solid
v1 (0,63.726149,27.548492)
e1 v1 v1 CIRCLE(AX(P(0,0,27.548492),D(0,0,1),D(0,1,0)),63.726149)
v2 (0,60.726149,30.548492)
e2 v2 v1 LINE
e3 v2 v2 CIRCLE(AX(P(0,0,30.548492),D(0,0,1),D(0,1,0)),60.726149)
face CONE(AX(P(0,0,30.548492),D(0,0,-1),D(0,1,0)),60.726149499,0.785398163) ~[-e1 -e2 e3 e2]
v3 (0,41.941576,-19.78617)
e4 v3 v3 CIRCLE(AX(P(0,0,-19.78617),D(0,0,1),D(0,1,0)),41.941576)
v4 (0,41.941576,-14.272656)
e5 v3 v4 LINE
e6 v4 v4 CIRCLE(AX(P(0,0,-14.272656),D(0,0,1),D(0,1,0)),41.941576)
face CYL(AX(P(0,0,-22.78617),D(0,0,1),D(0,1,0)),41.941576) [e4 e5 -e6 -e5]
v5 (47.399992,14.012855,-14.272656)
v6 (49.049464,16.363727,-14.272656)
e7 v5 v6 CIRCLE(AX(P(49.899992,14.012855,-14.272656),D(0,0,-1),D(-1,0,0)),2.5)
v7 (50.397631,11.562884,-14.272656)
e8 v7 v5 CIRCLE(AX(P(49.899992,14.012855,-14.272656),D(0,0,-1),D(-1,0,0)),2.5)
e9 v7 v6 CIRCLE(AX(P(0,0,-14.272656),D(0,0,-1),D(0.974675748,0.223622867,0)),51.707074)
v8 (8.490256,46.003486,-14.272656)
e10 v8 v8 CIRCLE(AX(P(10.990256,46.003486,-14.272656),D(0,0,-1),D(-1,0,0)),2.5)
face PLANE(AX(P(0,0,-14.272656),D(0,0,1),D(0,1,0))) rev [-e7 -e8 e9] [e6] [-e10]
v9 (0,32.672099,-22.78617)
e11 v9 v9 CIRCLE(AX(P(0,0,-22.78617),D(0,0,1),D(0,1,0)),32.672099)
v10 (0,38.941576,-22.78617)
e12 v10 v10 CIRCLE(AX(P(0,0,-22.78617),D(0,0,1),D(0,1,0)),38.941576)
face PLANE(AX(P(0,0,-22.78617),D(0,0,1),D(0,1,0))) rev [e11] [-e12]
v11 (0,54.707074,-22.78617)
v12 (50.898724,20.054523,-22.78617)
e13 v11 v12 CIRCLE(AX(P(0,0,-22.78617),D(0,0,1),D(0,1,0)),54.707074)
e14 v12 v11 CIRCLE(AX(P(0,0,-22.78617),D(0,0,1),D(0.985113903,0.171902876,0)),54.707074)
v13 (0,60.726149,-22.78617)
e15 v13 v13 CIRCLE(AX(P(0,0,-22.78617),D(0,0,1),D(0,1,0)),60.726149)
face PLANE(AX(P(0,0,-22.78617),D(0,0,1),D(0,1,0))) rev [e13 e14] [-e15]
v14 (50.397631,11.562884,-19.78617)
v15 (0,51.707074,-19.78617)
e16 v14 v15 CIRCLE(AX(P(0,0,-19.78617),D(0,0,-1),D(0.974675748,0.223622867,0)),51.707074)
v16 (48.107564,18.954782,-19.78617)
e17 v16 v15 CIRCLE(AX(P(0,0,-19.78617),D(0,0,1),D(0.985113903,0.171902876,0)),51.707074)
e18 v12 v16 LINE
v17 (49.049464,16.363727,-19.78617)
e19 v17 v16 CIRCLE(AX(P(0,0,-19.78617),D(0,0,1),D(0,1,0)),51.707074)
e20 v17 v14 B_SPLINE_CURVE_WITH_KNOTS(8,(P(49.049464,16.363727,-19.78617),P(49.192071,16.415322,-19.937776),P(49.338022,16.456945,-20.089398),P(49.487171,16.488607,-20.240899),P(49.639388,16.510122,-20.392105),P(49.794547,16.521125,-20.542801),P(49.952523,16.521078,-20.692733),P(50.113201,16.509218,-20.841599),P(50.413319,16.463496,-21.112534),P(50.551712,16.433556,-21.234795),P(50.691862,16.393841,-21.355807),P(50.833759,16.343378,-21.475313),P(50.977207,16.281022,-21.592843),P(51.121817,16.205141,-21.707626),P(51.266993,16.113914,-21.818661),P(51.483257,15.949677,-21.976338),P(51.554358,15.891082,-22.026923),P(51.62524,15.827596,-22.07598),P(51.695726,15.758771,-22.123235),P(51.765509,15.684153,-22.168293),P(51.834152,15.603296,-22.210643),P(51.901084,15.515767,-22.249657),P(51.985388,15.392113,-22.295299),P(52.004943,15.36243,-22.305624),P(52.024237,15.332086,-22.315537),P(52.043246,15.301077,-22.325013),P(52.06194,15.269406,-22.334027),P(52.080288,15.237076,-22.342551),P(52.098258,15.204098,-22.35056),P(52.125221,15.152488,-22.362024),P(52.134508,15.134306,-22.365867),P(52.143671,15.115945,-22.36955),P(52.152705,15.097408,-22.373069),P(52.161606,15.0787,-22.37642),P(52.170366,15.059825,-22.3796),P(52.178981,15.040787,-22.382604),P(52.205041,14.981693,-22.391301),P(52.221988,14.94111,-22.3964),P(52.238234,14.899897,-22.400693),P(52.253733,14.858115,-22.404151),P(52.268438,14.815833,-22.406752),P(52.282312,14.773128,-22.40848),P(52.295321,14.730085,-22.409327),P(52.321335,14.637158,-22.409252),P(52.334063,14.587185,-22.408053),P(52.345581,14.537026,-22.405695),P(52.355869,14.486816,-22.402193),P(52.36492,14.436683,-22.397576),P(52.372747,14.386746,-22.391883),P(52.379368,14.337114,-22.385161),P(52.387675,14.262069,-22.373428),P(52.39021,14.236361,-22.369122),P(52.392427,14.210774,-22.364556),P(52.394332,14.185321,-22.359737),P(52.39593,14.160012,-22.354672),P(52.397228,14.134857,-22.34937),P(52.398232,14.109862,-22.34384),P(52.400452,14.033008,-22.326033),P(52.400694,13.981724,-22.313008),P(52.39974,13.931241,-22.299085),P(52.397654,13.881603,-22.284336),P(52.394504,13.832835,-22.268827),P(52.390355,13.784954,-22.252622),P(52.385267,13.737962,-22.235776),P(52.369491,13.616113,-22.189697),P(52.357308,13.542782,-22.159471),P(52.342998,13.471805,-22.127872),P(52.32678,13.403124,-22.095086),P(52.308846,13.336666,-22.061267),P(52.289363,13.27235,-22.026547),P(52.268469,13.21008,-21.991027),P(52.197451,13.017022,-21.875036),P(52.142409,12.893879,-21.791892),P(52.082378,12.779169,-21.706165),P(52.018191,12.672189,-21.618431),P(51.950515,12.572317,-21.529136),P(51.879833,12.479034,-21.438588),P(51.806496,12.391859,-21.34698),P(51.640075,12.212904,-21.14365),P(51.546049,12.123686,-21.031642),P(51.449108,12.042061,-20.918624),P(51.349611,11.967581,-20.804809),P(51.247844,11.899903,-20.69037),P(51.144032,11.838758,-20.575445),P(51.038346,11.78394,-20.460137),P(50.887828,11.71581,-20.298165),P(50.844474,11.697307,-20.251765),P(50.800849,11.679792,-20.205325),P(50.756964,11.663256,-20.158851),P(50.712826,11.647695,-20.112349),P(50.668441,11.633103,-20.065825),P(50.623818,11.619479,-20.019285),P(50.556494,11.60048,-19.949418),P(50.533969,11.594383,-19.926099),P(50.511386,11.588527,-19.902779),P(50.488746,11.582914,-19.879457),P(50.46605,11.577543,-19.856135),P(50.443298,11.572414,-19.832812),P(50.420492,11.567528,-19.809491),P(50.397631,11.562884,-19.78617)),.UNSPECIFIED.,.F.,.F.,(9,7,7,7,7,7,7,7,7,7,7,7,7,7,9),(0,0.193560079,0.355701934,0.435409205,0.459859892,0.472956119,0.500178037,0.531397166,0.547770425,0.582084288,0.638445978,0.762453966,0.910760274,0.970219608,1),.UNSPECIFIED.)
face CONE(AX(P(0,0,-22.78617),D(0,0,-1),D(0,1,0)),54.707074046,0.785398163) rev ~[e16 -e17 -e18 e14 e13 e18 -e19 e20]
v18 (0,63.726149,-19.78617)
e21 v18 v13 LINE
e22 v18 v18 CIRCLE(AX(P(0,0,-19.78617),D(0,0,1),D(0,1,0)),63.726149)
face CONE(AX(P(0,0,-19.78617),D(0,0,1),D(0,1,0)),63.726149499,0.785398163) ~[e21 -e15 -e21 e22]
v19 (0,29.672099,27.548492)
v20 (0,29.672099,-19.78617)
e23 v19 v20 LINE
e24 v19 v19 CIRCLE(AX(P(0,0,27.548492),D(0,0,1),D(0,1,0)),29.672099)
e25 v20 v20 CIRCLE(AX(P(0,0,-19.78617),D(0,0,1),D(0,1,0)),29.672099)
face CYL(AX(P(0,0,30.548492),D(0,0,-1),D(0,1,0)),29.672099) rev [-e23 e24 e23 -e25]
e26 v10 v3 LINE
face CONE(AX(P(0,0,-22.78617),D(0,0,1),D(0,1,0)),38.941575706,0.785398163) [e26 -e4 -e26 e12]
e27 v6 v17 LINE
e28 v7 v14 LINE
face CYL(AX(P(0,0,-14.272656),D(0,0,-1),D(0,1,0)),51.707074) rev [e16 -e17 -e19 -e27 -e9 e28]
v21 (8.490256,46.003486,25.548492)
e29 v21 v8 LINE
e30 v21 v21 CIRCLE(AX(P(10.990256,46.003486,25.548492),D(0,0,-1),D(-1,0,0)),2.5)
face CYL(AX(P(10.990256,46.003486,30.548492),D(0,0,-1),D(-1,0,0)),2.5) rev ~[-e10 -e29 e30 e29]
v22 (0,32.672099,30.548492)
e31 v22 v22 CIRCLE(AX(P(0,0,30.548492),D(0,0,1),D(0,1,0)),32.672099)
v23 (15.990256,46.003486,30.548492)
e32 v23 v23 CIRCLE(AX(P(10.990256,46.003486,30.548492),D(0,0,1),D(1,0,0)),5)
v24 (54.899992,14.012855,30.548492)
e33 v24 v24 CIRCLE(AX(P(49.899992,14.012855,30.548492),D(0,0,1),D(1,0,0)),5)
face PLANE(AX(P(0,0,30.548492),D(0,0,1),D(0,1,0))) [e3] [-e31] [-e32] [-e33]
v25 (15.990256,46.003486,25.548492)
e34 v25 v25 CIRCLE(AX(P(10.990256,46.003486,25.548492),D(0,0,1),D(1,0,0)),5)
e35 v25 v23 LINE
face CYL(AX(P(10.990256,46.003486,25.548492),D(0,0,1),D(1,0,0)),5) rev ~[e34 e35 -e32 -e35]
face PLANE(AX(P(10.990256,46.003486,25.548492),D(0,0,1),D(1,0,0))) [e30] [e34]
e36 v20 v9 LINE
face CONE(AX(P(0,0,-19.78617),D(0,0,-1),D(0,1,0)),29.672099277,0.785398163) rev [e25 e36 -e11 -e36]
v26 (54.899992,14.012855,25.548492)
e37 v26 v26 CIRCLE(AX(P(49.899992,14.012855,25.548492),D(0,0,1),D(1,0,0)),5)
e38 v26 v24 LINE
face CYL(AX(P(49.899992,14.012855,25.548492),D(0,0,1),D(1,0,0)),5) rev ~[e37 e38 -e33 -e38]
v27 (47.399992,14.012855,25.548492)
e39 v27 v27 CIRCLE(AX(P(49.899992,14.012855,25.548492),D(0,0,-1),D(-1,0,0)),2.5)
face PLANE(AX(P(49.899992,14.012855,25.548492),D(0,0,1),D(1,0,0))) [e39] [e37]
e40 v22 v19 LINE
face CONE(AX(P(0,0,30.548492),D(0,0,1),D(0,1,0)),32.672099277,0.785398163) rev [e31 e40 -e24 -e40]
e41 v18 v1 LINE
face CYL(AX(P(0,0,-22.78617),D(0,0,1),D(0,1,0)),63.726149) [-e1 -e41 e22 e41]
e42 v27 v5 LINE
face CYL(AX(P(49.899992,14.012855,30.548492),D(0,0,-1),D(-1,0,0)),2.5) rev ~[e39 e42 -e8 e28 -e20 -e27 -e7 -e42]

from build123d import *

# Parameters (mm, degrees)
F3_D           = 5
F3_CBORE_D     = 10
F3_CBORE_DEPTH = 5
F4_T6_ANGLE    = 291.5048547237
F4_T14_ANGLE   = 80.1015252238


# Not quite as in the source:
# - a fillet or chamfer that OpenCascade refuses, or shapes differently, is made with other operations: its cross-section is extruded or revolved along the edge and cut away or added


with BuildPart() as f1:
    # F0 (on Right) → F1 (revolve)
    with BuildSketch(Plane.YZ):
        Polygon((63.7261494994, 30.5484924465), (29.6720992774, 30.5484924465), (29.6720992774, -22.7861702442), (41.941575706, -22.7861702442), (41.941575706, -14.2726562917), (51.7070740461, -14.2726562917), (51.7070740461, -22.7861702442), (63.7261494994, -22.7861702442), align=None)
    revolve(axis=Axis((0, 0, 14.0182273462), (0, 0, 1)))

    # F3 (through all)
    with Locations(Plane.XY.offset(30.5484924465)):
        with Locations((10.9902555123, 46.0034860298), (49.8999916017, 14.0128545463)):
            CounterBoreHole(F3_D / 2, F3_CBORE_D / 2, F3_CBORE_DEPTH)

    # F4: chamfer of 3 on 7 edges, made by hand

    # F4_s1 → F4_t2 (revolve, cut)
    with BuildSketch(Plane.YZ):
        Polygon((60.7261494994, 30.5484924465), (63.7261494994, 27.5484924465), (63.7261494994, 30.5484924465), align=None)
    revolve(axis=Axis((0, 0, 30.5484924465), (0, 0, 1)), mode=Mode.SUBTRACT)

    # F4_s3 → F4_t4 (revolve, cut)
    with BuildSketch(Plane.YZ):
        Polygon((63.7261494994, -19.7861702442), (60.7261494994, -22.7861702442), (63.7261494994, -22.7861702442), align=None)
    revolve(axis=Axis((0, 0, -22.7861702442), (0, 0, 1)), mode=Mode.SUBTRACT)

    # F4_s5 → F4_t6 (revolve, cut)
    with BuildSketch(Plane.YZ):
        Polygon((54.7070740461, -22.7861702442), (51.7070740461, -19.7861702442), (51.7070740461, -22.7861702442), align=None)
    revolve(axis=Axis((0, 0, -22.7861702442), (0, 0, 1)), revolution_arc=F4_T6_ANGLE, mode=Mode.SUBTRACT)

    # F4_s7 → F4_t8 (revolve, cut)
    with BuildSketch(Plane.YZ):
        Polygon((38.941575706, -22.7861702442), (41.941575706, -19.7861702442), (41.941575706, -22.7861702442), align=None)
    revolve(axis=Axis((0, 0, -22.7861702442), (0, 0, 1)), mode=Mode.SUBTRACT)

    # F4_s9 → F4_t10 (revolve, cut)
    with BuildSketch(Plane.YZ):
        Polygon((29.6720992774, -19.7861702442), (32.6720992774, -22.7861702442), (29.6720992774, -22.7861702442), align=None)
    revolve(axis=Axis((0, 0, -22.7861702442), (0, 0, 1)), mode=Mode.SUBTRACT)

    # F4_s11 → F4_t12 (revolve, cut)
    with BuildSketch(Plane.YZ):
        Polygon((32.6720992774, 30.5484924465), (29.6720992774, 27.5484924465), (29.6720992774, 30.5484924465), align=None)
    revolve(axis=Axis((0, 0, 30.5484924465), (0, 0, 1)), mode=Mode.SUBTRACT)

    # F4_s13 → F4_t14 (revolve, cut)
    with BuildSketch(Plane(origin=(0, 0, 0), x_dir=(0, 0, 1), z_dir=(0.1719028764, -0.9851139026, 0))):
        Polygon((-22.7861702442, -54.7070740461), (-19.7861702442, -51.7070740461), (-22.7861702442, -51.7070740461), align=None)
    revolve(axis=Axis((0, 0, -22.7861702442), (0, 0, 1)), revolution_arc=F4_T14_ANGLE, mode=Mode.SUBTRACT)


solid = f1.part
